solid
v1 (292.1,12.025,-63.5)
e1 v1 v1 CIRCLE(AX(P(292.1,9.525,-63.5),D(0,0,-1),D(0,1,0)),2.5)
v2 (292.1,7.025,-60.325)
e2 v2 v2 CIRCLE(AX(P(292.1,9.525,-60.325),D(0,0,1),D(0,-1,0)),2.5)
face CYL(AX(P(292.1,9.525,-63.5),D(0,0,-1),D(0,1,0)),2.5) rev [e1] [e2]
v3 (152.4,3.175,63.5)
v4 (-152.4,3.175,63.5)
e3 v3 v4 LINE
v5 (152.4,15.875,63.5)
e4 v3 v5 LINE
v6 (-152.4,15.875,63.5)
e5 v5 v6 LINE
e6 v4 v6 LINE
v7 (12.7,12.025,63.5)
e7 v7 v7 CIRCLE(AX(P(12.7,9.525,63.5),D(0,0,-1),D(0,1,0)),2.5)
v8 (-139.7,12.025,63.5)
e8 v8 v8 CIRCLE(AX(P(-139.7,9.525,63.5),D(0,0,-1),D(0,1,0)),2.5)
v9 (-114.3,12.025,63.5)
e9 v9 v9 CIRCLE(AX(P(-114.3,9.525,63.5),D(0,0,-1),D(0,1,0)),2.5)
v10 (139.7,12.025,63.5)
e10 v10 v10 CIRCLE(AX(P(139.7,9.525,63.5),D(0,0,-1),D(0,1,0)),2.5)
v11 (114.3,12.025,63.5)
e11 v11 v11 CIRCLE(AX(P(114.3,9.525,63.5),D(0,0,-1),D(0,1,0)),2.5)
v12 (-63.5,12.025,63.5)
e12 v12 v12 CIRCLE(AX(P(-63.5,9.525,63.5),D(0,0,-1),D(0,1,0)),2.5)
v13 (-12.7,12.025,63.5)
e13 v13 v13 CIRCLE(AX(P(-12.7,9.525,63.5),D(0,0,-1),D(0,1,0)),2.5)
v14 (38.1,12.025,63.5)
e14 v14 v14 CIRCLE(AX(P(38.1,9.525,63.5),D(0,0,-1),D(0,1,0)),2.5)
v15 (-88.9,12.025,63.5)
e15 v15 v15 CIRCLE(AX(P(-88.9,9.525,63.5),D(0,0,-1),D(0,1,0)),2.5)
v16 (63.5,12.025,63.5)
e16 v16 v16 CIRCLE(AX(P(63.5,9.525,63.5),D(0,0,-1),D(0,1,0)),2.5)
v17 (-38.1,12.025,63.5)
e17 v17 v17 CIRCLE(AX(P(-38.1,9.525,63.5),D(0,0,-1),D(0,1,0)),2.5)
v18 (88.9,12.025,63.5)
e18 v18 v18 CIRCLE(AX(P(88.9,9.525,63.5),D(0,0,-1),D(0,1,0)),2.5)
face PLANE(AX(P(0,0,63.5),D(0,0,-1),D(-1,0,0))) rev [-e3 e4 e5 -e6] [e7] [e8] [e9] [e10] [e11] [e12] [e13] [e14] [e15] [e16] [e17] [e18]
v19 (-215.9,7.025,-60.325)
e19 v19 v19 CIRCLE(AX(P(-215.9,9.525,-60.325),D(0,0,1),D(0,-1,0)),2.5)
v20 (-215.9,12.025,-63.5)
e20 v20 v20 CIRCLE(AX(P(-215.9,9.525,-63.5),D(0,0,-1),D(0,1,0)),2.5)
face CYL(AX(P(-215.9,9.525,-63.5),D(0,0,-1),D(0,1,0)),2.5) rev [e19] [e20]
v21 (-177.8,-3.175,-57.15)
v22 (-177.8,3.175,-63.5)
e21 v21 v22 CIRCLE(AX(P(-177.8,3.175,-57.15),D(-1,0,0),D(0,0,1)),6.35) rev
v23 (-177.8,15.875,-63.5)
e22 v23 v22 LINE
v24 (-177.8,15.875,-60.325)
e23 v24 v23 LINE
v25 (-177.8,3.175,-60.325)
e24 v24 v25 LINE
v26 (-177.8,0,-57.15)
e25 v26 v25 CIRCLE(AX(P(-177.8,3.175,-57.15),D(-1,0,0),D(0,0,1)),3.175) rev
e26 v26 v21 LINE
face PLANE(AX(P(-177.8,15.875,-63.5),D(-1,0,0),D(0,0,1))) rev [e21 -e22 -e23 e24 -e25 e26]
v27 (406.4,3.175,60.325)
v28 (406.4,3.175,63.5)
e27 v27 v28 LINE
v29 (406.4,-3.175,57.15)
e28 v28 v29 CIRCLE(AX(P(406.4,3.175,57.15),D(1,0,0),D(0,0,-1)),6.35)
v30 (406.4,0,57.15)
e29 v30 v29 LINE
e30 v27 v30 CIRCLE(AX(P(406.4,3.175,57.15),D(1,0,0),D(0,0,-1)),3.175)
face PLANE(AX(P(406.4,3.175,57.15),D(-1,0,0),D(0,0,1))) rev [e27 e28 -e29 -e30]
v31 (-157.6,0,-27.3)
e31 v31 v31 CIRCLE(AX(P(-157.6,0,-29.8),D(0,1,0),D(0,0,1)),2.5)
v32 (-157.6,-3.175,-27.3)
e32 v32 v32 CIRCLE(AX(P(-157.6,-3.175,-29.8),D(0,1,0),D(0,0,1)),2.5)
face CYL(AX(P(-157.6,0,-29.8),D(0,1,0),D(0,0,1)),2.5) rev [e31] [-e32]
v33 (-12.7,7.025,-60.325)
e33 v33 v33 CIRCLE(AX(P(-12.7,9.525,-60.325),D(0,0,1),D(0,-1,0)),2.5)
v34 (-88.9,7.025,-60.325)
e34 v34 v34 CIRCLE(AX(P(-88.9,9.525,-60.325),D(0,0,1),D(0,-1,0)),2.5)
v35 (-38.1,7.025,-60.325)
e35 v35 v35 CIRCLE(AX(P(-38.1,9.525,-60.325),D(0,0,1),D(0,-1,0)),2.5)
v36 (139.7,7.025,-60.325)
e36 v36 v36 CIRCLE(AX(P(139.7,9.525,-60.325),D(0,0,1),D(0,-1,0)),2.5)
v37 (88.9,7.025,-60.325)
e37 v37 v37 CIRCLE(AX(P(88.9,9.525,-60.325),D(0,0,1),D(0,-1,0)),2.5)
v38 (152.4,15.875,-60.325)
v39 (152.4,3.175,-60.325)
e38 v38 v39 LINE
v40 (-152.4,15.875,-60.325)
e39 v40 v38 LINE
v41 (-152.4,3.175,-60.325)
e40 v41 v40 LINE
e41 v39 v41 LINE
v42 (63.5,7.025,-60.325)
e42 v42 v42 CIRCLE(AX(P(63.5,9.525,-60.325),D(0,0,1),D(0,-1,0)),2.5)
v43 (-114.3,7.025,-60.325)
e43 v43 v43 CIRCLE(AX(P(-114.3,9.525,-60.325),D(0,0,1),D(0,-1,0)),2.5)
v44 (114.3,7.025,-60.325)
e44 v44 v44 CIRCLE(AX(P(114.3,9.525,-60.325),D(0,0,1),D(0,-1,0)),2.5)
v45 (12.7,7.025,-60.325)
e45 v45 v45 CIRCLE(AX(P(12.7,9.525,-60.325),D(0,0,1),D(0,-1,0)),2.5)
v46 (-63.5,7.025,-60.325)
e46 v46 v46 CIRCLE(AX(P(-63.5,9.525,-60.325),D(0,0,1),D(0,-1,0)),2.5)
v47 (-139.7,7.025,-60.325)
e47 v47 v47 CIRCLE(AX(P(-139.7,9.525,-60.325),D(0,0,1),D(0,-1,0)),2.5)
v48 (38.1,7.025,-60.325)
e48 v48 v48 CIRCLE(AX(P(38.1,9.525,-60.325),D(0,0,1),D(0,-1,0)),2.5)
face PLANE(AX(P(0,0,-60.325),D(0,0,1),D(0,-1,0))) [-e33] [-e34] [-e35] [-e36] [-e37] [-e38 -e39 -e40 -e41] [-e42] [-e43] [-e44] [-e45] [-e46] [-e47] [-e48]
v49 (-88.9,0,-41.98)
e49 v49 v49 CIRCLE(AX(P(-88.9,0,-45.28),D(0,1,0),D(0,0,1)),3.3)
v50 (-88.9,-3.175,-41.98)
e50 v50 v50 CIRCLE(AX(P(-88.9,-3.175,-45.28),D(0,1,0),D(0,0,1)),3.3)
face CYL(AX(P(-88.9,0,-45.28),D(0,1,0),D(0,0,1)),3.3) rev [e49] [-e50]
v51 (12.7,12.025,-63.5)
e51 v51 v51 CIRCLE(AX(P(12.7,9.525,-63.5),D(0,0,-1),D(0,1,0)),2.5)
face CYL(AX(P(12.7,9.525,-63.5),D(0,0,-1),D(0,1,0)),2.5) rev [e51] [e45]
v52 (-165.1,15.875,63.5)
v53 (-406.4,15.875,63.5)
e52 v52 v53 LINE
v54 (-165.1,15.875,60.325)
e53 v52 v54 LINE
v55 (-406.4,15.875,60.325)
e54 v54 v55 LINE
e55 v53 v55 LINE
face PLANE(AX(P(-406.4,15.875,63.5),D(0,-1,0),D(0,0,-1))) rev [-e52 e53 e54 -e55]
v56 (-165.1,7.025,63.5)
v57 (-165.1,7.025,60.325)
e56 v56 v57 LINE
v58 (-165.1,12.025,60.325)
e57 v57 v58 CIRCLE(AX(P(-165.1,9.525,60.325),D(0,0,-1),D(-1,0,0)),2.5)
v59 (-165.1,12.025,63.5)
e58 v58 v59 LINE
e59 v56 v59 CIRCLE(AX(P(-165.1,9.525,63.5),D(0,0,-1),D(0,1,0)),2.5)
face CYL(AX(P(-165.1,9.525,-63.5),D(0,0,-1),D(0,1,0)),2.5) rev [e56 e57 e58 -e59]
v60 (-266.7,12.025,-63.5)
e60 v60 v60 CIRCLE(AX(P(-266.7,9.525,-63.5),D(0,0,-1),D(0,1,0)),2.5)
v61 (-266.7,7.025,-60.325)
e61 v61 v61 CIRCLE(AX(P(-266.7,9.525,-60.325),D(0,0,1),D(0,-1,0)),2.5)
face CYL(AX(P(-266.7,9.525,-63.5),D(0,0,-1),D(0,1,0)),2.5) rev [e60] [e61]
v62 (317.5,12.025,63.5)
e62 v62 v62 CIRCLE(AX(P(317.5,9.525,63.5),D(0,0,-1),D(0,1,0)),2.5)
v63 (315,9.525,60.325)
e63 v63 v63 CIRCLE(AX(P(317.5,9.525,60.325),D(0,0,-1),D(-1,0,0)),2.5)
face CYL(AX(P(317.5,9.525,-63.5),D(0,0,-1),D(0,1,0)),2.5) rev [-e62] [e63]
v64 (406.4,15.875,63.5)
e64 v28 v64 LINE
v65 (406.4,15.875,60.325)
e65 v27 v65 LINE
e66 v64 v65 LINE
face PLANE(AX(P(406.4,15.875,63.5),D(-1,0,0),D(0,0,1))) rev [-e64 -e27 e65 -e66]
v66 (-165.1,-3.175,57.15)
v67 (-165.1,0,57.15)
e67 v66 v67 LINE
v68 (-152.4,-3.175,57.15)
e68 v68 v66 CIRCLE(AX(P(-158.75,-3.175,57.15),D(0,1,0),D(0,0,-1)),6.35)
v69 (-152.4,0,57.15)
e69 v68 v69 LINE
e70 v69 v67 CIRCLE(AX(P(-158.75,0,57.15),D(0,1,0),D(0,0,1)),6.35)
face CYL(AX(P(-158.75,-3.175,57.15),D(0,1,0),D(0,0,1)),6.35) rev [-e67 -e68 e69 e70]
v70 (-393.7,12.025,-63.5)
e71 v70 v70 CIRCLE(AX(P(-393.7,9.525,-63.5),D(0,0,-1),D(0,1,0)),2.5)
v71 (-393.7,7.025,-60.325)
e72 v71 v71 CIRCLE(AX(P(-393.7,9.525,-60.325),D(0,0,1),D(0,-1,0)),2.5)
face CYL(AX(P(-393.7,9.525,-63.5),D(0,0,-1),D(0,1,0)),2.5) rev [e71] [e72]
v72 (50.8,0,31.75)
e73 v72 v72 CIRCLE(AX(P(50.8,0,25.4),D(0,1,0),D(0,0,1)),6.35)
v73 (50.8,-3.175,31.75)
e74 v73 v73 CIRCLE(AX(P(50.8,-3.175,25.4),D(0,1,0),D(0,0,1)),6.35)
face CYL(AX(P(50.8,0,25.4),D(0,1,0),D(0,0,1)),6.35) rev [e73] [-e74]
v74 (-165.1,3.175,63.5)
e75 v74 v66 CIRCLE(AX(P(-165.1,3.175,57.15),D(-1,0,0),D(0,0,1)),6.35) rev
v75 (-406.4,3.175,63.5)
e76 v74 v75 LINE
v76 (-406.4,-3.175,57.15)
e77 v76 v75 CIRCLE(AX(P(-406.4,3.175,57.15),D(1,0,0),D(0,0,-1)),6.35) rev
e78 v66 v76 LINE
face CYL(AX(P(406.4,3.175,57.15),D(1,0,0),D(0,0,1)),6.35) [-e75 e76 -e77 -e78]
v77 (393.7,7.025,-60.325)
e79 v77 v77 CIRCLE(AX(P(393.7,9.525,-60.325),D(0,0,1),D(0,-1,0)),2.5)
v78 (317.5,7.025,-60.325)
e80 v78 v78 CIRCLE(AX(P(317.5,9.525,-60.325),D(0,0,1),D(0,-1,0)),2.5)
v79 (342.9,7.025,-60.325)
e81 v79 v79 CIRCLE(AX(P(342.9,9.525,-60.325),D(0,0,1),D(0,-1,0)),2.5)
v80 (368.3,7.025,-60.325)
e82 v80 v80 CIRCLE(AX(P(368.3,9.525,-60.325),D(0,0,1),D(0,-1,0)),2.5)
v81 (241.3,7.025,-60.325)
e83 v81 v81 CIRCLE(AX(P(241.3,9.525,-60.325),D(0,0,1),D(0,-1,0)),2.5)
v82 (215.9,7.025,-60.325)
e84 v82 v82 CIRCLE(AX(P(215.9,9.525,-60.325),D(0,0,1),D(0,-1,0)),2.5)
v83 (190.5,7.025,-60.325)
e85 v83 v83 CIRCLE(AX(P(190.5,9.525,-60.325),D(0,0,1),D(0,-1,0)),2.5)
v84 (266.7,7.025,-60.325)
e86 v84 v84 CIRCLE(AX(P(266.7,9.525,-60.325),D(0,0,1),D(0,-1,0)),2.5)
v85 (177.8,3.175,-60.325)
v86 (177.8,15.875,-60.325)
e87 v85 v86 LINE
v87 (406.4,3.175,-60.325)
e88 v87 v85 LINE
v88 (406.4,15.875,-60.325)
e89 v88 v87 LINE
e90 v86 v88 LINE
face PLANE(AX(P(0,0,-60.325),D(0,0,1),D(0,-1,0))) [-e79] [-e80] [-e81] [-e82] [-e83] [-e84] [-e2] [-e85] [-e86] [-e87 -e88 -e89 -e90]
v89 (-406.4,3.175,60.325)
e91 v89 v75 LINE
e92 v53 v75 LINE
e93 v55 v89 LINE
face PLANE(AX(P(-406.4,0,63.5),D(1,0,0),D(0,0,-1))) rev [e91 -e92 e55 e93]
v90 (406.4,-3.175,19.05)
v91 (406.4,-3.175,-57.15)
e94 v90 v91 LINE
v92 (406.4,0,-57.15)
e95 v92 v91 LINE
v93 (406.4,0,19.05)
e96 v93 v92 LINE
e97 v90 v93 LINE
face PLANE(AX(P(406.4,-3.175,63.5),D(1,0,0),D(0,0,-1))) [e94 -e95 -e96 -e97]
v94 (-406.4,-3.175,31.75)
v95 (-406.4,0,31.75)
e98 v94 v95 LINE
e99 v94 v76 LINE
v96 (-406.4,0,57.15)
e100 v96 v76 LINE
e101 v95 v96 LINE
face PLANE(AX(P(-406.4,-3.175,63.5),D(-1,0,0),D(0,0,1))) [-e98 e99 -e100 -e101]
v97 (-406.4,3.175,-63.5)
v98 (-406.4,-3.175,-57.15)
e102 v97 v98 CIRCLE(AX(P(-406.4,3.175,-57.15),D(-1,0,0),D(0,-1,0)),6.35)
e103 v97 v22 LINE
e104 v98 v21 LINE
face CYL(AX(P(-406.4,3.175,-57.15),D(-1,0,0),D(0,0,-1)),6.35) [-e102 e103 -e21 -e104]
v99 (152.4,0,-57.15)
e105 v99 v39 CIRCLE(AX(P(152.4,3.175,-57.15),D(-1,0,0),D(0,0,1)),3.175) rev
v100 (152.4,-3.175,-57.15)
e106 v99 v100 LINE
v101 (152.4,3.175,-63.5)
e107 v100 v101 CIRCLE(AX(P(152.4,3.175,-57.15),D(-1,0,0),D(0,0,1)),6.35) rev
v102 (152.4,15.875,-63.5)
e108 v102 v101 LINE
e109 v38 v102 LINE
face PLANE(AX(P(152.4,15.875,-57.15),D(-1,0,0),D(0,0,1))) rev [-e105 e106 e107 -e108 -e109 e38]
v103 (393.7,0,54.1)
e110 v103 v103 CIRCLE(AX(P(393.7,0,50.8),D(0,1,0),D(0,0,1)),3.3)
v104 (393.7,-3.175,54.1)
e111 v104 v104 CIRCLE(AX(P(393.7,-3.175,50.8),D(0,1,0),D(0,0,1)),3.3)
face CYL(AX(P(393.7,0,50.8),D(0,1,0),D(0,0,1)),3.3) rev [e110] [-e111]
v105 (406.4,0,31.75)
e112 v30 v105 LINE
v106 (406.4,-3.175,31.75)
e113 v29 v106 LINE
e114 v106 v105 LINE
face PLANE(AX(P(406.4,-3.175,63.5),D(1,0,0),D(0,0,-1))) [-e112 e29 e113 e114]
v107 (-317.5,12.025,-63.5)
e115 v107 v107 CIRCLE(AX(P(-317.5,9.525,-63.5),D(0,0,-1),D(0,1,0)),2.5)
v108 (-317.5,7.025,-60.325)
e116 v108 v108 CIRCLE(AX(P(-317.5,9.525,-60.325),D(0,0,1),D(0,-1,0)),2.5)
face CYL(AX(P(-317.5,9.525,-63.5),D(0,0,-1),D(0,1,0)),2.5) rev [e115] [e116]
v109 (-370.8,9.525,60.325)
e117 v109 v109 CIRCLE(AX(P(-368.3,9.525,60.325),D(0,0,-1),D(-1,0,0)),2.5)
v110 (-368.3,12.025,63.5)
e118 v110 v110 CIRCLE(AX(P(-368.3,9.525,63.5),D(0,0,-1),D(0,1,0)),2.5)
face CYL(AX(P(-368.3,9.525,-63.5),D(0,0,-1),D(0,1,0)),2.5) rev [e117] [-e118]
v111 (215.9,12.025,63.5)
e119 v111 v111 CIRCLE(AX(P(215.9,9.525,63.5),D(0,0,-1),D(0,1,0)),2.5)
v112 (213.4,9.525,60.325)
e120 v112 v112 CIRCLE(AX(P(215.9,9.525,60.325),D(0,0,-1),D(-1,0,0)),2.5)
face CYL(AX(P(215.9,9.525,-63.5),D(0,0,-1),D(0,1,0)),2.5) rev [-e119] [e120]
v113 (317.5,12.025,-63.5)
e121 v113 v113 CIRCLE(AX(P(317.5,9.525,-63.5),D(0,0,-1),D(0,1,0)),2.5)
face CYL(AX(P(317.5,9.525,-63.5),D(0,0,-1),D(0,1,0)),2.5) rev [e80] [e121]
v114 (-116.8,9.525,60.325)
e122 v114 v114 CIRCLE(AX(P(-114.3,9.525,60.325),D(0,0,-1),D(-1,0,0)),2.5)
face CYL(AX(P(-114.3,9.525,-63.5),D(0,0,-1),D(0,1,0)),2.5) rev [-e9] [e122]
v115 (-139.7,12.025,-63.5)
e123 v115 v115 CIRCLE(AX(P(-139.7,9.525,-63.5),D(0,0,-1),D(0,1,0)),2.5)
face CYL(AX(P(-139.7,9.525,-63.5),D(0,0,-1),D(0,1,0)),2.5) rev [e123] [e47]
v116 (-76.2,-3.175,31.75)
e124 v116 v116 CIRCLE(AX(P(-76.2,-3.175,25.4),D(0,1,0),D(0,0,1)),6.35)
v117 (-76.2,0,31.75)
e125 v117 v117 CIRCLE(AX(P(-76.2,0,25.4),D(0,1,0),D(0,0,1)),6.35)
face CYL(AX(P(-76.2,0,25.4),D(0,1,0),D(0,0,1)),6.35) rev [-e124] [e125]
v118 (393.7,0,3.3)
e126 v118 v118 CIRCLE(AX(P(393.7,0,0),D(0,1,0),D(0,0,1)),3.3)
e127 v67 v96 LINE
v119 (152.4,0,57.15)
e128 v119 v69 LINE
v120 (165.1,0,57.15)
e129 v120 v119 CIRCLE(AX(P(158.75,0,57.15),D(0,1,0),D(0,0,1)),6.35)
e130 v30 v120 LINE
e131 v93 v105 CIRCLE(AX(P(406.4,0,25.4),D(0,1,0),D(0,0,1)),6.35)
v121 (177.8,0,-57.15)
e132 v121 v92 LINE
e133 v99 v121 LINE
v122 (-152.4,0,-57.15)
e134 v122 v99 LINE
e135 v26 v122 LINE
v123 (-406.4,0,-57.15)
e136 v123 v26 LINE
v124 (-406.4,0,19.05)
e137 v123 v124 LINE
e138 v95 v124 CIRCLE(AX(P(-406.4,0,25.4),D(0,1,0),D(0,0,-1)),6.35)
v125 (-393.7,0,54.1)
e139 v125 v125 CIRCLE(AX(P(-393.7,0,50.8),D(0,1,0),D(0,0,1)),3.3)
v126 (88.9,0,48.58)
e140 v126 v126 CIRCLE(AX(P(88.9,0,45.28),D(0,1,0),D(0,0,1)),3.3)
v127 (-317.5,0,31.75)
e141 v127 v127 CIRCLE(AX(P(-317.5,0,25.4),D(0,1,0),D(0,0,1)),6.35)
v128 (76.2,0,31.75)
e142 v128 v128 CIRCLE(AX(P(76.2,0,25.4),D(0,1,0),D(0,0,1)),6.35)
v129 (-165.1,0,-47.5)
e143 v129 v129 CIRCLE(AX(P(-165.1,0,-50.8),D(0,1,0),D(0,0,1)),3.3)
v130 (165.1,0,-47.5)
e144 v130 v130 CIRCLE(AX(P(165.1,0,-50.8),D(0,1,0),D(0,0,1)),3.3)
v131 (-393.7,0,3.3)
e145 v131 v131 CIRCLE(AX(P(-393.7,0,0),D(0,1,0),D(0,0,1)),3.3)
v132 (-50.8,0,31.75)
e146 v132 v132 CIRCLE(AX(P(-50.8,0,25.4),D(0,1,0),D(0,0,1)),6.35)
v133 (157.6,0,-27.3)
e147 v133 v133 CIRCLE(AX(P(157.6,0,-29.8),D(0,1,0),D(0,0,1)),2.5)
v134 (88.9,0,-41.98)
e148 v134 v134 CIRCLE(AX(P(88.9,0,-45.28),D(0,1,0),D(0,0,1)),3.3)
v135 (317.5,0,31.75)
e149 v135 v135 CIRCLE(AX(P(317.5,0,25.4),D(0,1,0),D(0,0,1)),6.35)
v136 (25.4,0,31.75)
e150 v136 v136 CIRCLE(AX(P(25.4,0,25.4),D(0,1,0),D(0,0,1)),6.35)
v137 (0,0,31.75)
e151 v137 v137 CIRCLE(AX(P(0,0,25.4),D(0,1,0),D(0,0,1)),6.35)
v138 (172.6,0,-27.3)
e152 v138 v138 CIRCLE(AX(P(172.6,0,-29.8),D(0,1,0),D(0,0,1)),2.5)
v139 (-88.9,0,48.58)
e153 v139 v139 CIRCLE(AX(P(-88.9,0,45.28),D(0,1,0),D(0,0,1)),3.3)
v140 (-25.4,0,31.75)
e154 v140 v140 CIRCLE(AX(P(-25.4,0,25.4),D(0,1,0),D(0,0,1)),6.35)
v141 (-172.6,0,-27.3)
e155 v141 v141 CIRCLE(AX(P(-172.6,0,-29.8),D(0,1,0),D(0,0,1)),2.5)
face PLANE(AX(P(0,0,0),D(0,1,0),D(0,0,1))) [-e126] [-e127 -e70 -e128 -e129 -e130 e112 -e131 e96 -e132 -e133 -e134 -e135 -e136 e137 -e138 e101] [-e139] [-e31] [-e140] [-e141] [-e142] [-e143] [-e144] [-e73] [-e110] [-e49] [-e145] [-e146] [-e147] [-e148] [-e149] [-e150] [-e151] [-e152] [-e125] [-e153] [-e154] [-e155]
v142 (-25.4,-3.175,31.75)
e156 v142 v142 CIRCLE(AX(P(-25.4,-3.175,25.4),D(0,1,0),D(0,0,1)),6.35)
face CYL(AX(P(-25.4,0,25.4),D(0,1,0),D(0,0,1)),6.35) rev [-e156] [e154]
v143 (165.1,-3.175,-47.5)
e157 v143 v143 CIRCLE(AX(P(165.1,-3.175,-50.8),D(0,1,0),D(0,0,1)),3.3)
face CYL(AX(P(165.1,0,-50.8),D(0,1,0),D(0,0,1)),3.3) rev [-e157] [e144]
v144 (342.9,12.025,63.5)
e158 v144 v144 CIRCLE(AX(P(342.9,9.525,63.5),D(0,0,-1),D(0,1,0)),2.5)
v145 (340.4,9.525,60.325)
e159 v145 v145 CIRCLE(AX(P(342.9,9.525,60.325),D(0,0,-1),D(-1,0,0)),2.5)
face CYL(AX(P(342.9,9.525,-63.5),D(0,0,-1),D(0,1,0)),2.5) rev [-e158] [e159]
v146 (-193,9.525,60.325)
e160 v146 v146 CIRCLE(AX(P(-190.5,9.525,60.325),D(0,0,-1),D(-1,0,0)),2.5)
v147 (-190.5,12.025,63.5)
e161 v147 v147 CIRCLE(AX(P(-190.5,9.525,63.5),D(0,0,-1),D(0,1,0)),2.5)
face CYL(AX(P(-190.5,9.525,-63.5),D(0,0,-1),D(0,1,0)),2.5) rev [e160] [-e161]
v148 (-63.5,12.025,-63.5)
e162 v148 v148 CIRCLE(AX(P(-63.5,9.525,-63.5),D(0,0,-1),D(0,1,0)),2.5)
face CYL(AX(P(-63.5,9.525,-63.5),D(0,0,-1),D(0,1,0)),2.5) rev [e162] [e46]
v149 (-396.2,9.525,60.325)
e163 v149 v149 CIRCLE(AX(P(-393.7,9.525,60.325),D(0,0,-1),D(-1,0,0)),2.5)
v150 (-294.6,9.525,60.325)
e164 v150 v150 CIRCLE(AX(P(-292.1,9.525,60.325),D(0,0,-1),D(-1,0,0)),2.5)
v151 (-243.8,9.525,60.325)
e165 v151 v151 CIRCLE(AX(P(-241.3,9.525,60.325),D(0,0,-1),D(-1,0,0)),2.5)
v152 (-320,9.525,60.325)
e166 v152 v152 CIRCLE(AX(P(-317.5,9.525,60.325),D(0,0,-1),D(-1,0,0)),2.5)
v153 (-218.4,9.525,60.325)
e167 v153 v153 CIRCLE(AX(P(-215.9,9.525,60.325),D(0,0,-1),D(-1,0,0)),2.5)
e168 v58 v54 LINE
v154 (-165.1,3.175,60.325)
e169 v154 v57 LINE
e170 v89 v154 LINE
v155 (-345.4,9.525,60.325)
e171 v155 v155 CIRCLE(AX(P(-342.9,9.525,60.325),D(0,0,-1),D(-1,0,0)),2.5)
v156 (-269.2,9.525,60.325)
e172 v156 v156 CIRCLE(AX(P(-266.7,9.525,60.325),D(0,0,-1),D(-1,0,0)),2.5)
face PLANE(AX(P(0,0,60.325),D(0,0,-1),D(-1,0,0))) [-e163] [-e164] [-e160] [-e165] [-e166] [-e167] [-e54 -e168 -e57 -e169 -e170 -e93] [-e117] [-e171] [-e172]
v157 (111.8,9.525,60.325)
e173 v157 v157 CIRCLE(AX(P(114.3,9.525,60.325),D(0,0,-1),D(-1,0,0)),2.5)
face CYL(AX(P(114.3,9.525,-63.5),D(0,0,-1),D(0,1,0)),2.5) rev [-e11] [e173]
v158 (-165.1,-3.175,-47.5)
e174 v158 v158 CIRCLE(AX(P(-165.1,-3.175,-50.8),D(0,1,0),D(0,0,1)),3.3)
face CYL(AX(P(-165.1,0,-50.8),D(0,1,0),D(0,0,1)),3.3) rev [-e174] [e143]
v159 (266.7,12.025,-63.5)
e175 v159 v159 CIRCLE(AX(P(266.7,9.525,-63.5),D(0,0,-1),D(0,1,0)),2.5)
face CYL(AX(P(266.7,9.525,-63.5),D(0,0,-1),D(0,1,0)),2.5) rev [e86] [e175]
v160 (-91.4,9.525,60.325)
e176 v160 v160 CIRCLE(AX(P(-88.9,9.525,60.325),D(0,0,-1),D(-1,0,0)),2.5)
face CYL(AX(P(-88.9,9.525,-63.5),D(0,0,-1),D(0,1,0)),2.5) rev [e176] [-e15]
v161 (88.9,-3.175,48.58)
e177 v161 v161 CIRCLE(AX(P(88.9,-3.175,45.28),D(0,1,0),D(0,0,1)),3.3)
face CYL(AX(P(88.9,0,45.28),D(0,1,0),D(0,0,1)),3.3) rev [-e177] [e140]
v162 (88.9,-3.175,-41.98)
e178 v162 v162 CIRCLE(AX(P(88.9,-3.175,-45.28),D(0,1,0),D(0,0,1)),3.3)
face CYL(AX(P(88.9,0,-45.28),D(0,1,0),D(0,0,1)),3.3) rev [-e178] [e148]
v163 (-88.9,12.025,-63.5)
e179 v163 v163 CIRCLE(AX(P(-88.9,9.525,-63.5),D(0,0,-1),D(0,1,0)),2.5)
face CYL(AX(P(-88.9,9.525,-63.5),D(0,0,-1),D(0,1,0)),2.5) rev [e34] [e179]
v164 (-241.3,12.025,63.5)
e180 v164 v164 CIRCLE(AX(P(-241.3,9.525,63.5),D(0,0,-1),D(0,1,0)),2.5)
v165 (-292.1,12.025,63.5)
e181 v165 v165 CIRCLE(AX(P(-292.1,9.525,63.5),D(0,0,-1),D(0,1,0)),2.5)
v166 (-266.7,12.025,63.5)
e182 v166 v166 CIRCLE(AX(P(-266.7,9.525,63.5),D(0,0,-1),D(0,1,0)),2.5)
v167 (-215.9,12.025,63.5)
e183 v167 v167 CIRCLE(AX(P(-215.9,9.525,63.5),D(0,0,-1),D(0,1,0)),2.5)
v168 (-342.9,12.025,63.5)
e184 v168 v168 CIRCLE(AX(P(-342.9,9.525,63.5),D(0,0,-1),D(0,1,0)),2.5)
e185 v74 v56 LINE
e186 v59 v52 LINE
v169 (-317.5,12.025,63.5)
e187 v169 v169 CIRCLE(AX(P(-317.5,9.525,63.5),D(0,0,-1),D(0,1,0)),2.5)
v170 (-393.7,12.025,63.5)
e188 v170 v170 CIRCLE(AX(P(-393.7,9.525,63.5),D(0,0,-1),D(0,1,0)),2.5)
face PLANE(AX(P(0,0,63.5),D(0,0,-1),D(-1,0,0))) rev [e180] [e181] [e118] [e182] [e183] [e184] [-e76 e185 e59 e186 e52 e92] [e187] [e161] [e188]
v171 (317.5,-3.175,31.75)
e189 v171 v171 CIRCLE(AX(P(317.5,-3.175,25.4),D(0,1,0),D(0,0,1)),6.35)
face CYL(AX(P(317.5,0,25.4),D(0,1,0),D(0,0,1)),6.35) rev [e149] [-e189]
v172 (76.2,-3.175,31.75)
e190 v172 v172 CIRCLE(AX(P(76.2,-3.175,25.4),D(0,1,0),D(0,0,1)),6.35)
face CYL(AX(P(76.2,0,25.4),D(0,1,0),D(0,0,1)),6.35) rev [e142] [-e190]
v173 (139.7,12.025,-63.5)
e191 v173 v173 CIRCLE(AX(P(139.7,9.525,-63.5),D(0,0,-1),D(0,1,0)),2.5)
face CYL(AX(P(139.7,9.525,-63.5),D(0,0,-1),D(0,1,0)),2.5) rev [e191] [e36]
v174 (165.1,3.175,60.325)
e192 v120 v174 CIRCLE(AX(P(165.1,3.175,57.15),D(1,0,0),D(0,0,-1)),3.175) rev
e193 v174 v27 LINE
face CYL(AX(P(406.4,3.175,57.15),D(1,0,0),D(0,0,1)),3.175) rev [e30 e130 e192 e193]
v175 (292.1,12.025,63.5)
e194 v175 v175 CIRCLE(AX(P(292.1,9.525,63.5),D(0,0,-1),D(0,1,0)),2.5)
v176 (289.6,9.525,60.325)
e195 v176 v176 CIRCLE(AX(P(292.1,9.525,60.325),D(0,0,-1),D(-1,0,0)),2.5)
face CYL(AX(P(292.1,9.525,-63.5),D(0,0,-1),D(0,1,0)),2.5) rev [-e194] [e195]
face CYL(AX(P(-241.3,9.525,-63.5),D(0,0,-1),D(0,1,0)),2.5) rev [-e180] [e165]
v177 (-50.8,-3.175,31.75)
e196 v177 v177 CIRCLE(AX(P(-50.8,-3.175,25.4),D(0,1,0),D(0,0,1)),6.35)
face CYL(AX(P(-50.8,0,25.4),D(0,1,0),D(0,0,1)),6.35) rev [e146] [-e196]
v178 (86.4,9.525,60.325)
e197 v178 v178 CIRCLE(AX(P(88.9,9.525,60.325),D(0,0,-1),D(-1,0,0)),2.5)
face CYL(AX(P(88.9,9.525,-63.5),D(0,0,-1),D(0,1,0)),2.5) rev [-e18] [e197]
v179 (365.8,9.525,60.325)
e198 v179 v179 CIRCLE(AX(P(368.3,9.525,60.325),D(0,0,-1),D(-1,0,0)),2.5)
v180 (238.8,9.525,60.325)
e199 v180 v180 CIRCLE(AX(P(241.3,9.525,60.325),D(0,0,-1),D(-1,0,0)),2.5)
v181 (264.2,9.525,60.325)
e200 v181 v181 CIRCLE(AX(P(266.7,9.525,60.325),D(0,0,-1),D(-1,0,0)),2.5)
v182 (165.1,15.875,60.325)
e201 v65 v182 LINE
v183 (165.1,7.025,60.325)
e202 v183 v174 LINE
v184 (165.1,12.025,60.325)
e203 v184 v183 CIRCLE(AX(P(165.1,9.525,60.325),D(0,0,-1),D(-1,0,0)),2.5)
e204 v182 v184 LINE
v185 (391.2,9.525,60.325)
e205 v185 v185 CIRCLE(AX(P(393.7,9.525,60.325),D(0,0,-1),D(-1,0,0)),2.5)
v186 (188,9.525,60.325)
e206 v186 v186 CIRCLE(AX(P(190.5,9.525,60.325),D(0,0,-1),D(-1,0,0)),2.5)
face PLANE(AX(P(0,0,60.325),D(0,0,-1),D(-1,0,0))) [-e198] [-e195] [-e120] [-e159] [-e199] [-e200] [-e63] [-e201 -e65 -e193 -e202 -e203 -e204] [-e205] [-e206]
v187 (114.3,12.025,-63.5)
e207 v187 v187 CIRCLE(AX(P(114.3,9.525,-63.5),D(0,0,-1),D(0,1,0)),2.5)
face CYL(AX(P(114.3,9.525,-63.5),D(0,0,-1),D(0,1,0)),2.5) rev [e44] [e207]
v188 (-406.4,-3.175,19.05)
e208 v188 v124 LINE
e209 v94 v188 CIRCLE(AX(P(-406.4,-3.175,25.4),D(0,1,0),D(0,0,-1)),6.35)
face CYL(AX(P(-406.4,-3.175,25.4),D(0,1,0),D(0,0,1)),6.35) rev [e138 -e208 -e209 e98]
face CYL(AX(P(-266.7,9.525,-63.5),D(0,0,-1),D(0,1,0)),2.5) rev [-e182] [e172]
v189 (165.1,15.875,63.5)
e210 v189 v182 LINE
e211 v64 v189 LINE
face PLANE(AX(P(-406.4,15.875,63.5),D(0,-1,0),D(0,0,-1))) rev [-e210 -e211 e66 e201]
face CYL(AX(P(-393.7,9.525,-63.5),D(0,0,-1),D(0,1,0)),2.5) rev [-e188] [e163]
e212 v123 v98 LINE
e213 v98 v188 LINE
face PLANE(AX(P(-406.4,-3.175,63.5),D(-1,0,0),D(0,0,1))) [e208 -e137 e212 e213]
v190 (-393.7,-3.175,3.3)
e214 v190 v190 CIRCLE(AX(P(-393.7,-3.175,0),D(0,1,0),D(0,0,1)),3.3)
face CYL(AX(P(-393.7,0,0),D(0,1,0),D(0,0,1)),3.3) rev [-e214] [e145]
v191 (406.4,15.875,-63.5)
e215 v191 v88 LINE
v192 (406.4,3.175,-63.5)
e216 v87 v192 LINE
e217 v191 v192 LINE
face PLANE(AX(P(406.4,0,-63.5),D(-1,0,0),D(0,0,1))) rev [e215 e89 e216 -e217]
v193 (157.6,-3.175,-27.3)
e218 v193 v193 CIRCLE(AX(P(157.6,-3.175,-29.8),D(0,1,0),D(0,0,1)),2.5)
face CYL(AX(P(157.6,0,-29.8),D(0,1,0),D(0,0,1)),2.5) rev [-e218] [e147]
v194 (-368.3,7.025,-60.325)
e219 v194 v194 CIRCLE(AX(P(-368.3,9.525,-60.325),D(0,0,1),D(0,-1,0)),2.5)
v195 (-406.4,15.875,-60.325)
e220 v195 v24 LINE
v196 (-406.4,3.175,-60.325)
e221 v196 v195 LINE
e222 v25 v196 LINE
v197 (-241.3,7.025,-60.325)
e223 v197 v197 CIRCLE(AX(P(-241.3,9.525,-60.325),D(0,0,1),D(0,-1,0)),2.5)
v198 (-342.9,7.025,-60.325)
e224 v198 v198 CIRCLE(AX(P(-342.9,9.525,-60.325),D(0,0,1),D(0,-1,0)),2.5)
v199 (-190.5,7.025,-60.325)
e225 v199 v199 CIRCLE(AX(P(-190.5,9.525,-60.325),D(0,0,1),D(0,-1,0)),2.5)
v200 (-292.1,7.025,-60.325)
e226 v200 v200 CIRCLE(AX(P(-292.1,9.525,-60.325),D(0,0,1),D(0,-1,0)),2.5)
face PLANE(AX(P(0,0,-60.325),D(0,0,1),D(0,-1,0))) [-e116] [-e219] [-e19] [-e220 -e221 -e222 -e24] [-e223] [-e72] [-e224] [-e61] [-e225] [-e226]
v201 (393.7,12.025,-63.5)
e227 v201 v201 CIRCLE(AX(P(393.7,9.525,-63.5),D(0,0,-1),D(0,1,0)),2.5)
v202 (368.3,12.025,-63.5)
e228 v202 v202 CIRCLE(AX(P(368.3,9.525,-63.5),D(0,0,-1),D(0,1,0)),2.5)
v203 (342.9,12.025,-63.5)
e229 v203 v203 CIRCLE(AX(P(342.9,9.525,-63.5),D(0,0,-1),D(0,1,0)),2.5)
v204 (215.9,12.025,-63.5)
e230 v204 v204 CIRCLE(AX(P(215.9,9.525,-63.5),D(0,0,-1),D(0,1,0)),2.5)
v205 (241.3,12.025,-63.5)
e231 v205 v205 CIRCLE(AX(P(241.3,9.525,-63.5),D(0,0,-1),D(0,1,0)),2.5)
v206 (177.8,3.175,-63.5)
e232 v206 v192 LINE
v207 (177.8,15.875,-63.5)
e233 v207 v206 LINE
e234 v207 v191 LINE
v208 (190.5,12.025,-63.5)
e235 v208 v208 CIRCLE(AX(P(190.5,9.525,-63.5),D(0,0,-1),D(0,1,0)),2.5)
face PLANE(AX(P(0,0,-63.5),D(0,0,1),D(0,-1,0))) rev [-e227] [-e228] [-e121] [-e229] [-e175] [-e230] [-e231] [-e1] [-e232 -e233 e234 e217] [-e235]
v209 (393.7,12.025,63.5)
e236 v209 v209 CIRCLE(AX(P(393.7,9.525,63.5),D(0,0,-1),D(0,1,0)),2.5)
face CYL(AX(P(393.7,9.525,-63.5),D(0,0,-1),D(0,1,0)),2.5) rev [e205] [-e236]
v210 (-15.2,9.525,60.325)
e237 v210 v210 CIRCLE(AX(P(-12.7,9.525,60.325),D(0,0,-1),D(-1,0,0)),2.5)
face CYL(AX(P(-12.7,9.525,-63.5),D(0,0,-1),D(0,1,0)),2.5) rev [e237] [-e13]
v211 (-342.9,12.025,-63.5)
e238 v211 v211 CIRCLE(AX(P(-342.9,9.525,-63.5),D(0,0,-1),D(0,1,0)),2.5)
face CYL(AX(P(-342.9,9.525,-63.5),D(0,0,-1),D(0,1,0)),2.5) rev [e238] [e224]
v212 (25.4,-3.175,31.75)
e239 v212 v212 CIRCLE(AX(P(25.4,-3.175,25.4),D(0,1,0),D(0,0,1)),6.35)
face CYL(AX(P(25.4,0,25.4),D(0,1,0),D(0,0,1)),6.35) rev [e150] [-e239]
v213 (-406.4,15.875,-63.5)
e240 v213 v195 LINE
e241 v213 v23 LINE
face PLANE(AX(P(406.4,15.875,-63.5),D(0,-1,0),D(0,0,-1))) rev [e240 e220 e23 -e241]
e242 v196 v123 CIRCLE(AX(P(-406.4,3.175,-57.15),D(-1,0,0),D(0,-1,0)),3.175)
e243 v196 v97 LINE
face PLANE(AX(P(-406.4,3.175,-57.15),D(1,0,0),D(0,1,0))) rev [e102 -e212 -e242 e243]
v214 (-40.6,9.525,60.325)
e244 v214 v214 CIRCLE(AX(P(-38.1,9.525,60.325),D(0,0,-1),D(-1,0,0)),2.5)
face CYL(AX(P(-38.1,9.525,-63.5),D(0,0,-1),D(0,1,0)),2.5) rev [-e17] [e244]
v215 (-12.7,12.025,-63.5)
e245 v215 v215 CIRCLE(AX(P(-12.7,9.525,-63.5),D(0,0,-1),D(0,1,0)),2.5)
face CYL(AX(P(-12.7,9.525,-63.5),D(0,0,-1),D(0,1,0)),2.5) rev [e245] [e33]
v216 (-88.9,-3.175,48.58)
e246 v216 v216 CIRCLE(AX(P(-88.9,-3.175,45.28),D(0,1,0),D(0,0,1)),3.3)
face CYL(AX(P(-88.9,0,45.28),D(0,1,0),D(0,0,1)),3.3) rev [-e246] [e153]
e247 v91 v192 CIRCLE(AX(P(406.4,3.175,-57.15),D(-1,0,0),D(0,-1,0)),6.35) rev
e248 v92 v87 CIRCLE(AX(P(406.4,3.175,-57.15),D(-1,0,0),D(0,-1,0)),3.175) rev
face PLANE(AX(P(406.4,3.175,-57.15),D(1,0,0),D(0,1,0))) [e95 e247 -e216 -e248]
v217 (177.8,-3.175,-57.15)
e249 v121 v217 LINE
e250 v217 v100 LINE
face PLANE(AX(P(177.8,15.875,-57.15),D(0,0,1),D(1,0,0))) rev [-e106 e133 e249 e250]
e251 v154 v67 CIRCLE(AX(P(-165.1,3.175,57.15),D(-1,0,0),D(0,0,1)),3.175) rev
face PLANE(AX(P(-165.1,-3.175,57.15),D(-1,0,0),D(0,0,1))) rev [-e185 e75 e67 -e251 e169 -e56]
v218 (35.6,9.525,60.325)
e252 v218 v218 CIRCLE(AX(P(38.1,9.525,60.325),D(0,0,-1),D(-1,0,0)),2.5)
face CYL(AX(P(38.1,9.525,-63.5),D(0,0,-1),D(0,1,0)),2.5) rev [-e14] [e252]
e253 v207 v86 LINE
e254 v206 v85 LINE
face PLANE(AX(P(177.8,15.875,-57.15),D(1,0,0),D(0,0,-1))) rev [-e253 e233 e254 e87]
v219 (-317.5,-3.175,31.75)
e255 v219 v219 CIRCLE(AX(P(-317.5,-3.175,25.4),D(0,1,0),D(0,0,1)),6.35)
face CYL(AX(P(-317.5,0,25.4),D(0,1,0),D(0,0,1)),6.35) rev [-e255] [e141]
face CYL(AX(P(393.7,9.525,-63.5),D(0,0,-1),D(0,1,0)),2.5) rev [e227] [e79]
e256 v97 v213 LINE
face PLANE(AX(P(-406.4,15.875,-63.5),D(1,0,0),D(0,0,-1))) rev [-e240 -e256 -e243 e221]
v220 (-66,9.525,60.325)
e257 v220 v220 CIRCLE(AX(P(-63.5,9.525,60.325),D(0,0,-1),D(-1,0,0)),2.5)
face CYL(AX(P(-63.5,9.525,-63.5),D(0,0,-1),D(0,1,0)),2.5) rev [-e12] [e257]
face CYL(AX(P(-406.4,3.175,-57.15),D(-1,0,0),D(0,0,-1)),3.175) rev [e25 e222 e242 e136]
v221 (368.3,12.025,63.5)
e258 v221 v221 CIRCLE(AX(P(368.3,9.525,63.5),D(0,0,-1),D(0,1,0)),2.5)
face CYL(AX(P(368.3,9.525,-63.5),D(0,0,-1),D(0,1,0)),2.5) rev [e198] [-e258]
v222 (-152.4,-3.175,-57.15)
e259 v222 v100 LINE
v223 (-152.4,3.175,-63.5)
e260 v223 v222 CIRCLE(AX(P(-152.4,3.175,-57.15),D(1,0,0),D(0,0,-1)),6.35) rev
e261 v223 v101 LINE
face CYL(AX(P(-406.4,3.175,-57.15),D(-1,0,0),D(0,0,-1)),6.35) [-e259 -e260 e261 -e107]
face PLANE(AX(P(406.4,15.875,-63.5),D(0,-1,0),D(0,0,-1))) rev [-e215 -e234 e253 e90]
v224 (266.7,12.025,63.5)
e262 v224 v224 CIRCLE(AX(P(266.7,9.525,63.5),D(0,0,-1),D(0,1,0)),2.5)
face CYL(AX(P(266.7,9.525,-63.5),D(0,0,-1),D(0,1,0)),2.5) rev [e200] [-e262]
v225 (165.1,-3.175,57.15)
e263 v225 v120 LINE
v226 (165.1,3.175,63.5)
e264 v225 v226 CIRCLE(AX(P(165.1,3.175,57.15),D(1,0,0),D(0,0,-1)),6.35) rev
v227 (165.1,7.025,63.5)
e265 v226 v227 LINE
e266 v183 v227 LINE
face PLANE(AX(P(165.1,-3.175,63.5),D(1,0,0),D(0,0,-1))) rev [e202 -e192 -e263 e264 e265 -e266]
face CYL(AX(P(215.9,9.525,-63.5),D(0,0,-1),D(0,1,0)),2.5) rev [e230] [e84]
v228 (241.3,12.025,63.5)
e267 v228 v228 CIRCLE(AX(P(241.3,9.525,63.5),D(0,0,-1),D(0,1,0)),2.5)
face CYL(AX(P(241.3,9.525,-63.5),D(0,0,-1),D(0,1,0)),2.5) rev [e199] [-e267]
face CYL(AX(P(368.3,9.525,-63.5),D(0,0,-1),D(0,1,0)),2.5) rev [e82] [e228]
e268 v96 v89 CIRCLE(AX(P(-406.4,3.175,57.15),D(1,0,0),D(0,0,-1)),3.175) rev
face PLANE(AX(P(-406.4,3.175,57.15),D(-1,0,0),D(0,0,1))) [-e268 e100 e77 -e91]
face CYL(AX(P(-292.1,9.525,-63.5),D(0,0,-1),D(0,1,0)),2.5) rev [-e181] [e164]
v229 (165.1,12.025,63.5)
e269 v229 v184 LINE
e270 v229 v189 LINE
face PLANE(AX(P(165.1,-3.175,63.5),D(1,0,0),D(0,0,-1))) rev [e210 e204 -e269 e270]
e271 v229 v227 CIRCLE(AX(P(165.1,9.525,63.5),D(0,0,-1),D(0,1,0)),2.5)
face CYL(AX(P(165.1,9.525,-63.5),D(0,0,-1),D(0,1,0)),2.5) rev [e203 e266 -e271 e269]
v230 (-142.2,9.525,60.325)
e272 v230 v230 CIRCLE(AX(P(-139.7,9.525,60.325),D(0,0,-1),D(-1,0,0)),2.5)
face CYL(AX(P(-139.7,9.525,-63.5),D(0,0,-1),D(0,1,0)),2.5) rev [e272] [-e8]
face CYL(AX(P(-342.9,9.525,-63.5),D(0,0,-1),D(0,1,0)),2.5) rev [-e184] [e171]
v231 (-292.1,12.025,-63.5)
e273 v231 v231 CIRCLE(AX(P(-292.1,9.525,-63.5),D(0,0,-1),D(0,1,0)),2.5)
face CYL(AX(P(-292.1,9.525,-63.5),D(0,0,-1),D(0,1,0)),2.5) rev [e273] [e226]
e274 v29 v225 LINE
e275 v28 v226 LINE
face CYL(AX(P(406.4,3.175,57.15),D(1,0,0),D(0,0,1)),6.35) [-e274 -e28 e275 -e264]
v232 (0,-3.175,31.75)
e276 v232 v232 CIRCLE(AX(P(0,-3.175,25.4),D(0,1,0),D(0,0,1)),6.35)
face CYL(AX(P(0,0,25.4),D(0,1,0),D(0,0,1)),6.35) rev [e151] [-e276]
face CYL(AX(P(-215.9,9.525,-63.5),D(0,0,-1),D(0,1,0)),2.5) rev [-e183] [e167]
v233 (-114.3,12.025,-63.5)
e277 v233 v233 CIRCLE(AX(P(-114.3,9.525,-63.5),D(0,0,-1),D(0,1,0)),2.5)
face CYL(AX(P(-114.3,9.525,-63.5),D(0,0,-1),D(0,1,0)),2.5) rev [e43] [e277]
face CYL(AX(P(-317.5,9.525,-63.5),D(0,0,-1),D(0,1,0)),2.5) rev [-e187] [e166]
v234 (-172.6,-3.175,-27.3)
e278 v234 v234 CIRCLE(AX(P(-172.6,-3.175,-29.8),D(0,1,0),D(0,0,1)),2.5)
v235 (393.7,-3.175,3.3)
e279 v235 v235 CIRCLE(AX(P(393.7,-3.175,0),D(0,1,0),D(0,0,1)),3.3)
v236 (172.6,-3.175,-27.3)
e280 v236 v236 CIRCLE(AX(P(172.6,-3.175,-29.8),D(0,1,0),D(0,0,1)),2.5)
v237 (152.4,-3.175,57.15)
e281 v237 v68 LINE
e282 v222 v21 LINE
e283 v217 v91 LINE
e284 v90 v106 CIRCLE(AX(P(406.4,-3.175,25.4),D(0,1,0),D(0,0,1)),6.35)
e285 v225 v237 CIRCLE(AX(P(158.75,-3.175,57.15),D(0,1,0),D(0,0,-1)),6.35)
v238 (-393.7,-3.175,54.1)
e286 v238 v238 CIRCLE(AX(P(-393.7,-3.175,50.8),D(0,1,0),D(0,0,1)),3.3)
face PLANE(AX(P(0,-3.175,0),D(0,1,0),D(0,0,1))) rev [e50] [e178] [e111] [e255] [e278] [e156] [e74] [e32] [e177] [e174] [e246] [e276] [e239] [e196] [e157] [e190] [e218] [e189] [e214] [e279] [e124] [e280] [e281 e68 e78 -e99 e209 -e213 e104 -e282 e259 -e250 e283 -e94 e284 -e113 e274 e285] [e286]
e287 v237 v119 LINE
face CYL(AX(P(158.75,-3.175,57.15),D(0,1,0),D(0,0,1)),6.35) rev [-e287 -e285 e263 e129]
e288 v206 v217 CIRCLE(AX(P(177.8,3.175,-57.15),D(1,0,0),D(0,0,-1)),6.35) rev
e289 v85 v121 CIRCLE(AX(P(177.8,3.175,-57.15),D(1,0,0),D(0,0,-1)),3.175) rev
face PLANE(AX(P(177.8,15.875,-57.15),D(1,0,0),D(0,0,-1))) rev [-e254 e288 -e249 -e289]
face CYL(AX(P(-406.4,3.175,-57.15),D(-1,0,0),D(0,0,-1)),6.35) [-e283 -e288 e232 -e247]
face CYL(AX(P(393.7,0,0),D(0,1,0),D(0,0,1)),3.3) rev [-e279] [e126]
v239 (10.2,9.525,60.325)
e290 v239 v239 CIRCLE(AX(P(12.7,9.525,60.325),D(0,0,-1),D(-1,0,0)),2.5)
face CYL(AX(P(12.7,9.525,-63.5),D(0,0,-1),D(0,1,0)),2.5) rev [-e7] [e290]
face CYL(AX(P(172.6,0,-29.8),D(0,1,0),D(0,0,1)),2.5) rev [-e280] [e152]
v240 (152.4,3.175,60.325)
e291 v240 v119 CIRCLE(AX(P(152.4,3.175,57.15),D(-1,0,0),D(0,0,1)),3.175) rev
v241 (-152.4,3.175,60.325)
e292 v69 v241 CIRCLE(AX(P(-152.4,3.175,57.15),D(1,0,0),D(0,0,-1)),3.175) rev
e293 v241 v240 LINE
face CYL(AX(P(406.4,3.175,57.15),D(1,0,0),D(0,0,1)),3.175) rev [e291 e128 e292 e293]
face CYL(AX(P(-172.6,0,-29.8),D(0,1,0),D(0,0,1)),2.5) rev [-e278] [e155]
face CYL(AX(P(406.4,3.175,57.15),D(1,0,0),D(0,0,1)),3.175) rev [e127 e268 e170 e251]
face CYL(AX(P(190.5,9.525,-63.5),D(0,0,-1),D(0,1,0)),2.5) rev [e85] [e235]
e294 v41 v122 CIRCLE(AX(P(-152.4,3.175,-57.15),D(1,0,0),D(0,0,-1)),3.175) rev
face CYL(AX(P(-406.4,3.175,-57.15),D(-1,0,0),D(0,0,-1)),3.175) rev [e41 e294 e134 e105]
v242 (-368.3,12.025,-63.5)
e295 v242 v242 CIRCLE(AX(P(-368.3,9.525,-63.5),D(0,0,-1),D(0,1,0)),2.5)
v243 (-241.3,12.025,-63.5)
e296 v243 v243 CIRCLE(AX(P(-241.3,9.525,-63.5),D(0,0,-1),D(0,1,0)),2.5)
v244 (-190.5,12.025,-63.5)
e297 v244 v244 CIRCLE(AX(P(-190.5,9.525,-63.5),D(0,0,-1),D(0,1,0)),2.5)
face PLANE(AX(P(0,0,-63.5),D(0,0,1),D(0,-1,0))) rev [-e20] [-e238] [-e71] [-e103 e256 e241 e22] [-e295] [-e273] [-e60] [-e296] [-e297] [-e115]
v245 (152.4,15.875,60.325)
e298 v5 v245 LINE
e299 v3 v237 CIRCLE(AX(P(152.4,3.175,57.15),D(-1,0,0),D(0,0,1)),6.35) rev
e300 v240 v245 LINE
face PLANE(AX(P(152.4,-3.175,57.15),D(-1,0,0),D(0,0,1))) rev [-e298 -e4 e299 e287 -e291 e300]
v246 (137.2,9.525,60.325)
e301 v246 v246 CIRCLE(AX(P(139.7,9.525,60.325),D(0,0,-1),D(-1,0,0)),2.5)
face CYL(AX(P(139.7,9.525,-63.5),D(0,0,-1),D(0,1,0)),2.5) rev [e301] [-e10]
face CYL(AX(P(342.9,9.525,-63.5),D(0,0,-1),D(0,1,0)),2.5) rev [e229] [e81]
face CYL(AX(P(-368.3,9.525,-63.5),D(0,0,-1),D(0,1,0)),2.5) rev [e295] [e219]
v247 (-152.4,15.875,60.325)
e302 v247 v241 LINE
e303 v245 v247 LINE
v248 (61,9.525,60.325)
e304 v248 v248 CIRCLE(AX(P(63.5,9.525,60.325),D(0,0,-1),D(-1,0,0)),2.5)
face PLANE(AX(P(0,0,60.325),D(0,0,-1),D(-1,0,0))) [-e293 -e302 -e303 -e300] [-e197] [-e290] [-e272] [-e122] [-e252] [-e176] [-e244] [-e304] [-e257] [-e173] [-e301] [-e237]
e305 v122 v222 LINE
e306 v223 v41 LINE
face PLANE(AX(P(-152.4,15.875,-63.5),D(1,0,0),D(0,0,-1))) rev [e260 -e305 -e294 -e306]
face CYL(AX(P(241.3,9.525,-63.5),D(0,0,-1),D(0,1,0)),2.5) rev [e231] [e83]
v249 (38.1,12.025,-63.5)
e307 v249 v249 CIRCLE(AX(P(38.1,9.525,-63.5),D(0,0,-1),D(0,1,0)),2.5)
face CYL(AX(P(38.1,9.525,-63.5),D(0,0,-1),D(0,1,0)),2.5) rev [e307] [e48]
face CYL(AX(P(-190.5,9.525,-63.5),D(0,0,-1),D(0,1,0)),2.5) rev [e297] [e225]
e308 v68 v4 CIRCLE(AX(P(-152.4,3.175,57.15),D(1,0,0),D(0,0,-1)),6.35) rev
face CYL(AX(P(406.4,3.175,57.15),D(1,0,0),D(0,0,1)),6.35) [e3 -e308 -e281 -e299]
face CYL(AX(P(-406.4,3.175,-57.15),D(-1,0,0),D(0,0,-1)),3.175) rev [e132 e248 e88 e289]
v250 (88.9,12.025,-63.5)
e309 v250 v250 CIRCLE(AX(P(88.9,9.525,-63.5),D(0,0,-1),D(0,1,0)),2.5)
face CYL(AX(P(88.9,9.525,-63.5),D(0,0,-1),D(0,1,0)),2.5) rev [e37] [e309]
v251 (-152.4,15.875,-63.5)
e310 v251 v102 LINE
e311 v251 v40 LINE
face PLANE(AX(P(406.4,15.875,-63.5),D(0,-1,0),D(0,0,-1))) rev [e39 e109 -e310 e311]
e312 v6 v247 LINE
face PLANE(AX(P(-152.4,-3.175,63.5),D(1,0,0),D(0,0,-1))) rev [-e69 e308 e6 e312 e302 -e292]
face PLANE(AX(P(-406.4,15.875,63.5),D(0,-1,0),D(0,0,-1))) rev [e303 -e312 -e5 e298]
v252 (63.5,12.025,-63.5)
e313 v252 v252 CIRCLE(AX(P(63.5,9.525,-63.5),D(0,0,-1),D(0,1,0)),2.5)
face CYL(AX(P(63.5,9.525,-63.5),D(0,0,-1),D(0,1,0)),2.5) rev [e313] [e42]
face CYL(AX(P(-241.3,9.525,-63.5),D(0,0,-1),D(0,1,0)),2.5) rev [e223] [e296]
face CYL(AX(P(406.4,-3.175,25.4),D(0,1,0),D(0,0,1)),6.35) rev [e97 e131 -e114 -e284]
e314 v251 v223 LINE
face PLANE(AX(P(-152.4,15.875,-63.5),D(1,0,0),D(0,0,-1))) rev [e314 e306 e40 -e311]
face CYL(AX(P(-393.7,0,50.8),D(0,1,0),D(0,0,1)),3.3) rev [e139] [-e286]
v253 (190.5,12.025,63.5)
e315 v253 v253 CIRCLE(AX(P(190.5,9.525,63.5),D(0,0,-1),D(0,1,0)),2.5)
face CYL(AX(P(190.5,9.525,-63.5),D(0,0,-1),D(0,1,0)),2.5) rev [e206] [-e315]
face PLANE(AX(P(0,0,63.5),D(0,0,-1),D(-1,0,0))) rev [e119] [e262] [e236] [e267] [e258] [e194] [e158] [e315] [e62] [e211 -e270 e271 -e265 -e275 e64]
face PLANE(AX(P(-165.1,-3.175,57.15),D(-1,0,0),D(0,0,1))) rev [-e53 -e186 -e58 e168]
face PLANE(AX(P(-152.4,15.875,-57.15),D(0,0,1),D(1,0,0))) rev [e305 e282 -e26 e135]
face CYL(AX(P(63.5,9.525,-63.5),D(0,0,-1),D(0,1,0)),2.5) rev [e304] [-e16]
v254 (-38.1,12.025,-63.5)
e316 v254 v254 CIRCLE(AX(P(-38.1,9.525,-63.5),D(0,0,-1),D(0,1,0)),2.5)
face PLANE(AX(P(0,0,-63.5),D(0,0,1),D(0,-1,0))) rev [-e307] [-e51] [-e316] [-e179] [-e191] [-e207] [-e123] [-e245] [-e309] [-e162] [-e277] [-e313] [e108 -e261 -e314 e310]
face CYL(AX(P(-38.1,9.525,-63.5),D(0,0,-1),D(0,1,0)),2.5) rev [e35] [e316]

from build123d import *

# Parameters (mm, degrees)
SKETCH1_W                      = 812.8
SKETCH1_H                      = 127
BASE_FLANGE1_DEPTH             = 3.175
EDGE_FLANGE1_STRIP_W           = 19.05
EDGE_FLANGE1_STRIP_H           = 3.175
EDGE_FLANGE1_STRIP_CUT_DEPTH   = 812.8
EDGE_FLANGE1_STRIP_2_W         = 19.05
EDGE_FLANGE1_STRIP_2_H         = 3.175
EDGE_FLANGE1_STRIP_CUT_2_DEPTH = 812.8
EDGE_FLANGE1_DEPTH             = 812.8
EDGE_FLANGE1_BEND_DEPTH        = 812.8
MOUNTING_HOLES_D               = 5
LPATTERN3_COUNT                = 32
LPATTERN3_PITCH                = 25.4
SKETCH21_W                     = 25.4
SKETCH21_H                     = 6.35
CUT_EXTRUDE3_DEPTH             = 412.771918057
CUT_EXTRUDE4_DEPTH             = 412.637250045
CUT_EXTRUDE4_DEPTH_BACK        = 412.637250045
F_80_20_CONNECTION_HOLES_D     = 6.6
MOTOR_HOLES_D                  = 12.7
F_1_2_0_5_DIAMETER_HOLE1_D     = 12.7
CUT_EXTRUDE5_DEPTH             = 412.637250045
F_1_0MM_DOWEL_HOLE1_D          = 6.6
F_5_0MM_DOWEL_HOLE1_D          = 5


# Sheet-metal steps are written as plain solids
with BuildPart() as part:
    # Sketch1 → Base-Flange1 (new body)
    with BuildSketch(Plane(origin=(0, 0, 0), x_dir=(1, 0, 0), z_dir=(0, 1, 0))):
        Rectangle(SKETCH1_W, SKETCH1_H)
    extrude(amount=-BASE_FLANGE1_DEPTH)

    # Edge-Flange1 strip (across the edge) → Edge-Flange1 strip cut (cut)
    with BuildSketch(Plane(origin=(406.4, 0, -63.5), x_dir=(0, 0, 1), z_dir=(-1, 0, 0))):
        with Locations((-3.175, -1.5875)):
            Rectangle(EDGE_FLANGE1_STRIP_W, EDGE_FLANGE1_STRIP_H)
    extrude(amount=EDGE_FLANGE1_STRIP_CUT_DEPTH, mode=Mode.SUBTRACT)

    # Edge-Flange1 strip 2 (across the edge) → Edge-Flange1 strip cut 2 (cut)
    with BuildSketch(Plane(origin=(-406.4, 0, 63.5), x_dir=(0, 0, -1), z_dir=(1, 0, 0))):
        with Locations((-3.175, -1.5875)):
            Rectangle(EDGE_FLANGE1_STRIP_2_W, EDGE_FLANGE1_STRIP_2_H)
    extrude(amount=EDGE_FLANGE1_STRIP_CUT_2_DEPTH, mode=Mode.SUBTRACT)

    # Edge-Flange1 section (across the edge) → Edge-Flange1 (add)
    with BuildSketch(Plane(origin=(406.4, 0, -63.5), x_dir=(0, 0, 1), z_dir=(-1, 0, 0))):
        with BuildLine():
            Line((0, 3.175), (0, 15.875))
            Line((0, 15.875), (3.175, 15.875))
            Line((3.175, 15.875), (3.175, 3.175))
            ThreePointArc((3.175, 3.175), (4.10493597, 0.92993597), (6.35, 0))
            Line((6.35, 0), (6.35, -3.175))
            ThreePointArc((6.35, -3.175), (1.859871939, -1.315128061), (0, 3.175))
        make_face()
    extrude(amount=EDGE_FLANGE1_DEPTH)

    # Edge-Flange1 section 2 (across the edge) → Edge-Flange1 bend (add)
    with BuildSketch(Plane(origin=(-406.4, 0, 63.5), x_dir=(0, 0, -1), z_dir=(1, 0, 0))):
        with BuildLine():
            Line((0, 3.175), (0, 15.875))
            Line((0, 15.875), (3.175, 15.875))
            Line((3.175, 15.875), (3.175, 3.175))
            ThreePointArc((3.175, 3.175), (4.10493597, 0.92993597), (6.35, 0))
            Line((6.35, 0), (6.35, -3.175))
            ThreePointArc((6.35, -3.175), (1.859871939, -1.315128061), (0, 3.175))
        make_face()
    extrude(amount=EDGE_FLANGE1_BEND_DEPTH)

    # Mounting Holes (through all)
    with Locations(Plane(origin=(342.9, 0, -63.5), x_dir=(1, 0, 0), z_dir=(0, 0, -1))):
        with Locations((-736.6, -9.525)):
            mounting_holes = Hole(MOUNTING_HOLES_D / 2)

    # LPattern3: Mounting Holes ×32
    with Locations(*[(i * LPATTERN3_PITCH, 0, 0) for i in range(1, LPATTERN3_COUNT)]):
        add(mounting_holes, mode=Mode.SUBTRACT)

    # Sketch21 → Cut-Extrude3 (cut, through all)
    with BuildSketch(Plane.XZ.offset(3.175)):
        with Locations((165.1, -60.325)):
            Rectangle(SKETCH21_W, SKETCH21_H)
        with Locations((-165.1, -60.325)):
            Rectangle(SKETCH21_W, SKETCH21_H)
    extrude(amount=-CUT_EXTRUDE3_DEPTH, mode=Mode.SUBTRACT)

    # Sketch26 → Cut-Extrude4 (cut, two sides: drawn at the far end of the back side and taken through both)
    with BuildSketch(Plane(origin=(0, 0, 0), x_dir=(1, 0, 0), z_dir=(0, 1, 0)).offset(-CUT_EXTRUDE4_DEPTH_BACK)):
        with BuildLine():
            Line((152.4, -57.15), (152.4, -63.5))
            Line((152.4, -63.5), (165.1, -63.5))
            Line((165.1, -63.5), (165.1, -57.15))
            ThreePointArc((165.1, -57.15), (158.75, -50.8), (152.4, -57.15))
        make_face()
        with BuildLine():
            Line((-165.1, -57.15), (-165.1, -63.5))
            Line((-165.1, -63.5), (-152.4, -63.5))
            Line((-152.4, -63.5), (-152.4, -57.15))
            ThreePointArc((-152.4, -57.15), (-158.75, -50.8), (-165.1, -57.15))
        make_face()
    extrude(amount=CUT_EXTRUDE4_DEPTH + CUT_EXTRUDE4_DEPTH_BACK, mode=Mode.SUBTRACT)

    # 80/20 Connection Holes (through all)
    with Locations(Plane(origin=(0, 0, 0), x_dir=(1, 0, 0), z_dir=(0, 1, 0))):
        with Locations((-165.1, 50.8), (165.1, 50.8), (-393.7, 0), (-393.7, -50.8), (393.7, -50.8), (393.7, 0)):
            Hole(F_80_20_CONNECTION_HOLES_D / 2)

    # Motor Holes (through all)
    with Locations(Plane(origin=(0, 0, 0), x_dir=(1, 0, 0), z_dir=(0, 1, 0))):
        with Locations((-317.5, -25.4), (317.5, -25.4)):
            Hole(MOTOR_HOLES_D / 2)

    # 1/2 (0.5) Diameter Hole1 (through all)
    with Locations(Plane(origin=(0, 0, 0), x_dir=(1, 0, 0), z_dir=(0, 1, 0))):
        with Locations((76.2, -25.4), (0, -25.4), (-25.4, -25.4), (-50.8, -25.4), (-76.2, -25.4), (25.4, -25.4), (50.8, -25.4)):
            Hole(F_1_2_0_5_DIAMETER_HOLE1_D / 2)

    # Sketch33 → Cut-Extrude5 (cut, through all)
    with BuildSketch(Plane(origin=(0, 0, 0), x_dir=(1, 0, 0), z_dir=(0, 1, 0))):
        with BuildLine():
            Line((-406.4, -19.05), (-406.4, -31.75))
            ThreePointArc((-406.4, -31.75), (-400.05, -25.4), (-406.4, -19.05))
        make_face()
        with BuildLine():
            Line((406.4, -19.05), (406.4, -31.75))
            ThreePointArc((406.4, -31.75), (400.05, -25.4), (406.4, -19.05))
        make_face()
    extrude(amount=-CUT_EXTRUDE5_DEPTH, mode=Mode.SUBTRACT)

    # Ø1.0mm Dowel Hole1 (through all)
    with Locations(Plane(origin=(0, 0, 0), x_dir=(1, 0, 0), z_dir=(0, 1, 0))):
        with Locations((88.9, -45.28), (-88.9, 45.28), (-88.9, -45.28), (88.9, 45.28)):
            Hole(F_1_0MM_DOWEL_HOLE1_D / 2)

    # Ø5.0mm Dowel Hole1 (through all)
    with Locations(Plane(origin=(0, 0, 0), x_dir=(1, 0, 0), z_dir=(0, 1, 0))):
        with Locations((172.6, 29.8), (-172.6, 29.8), (-157.6, 29.8), (157.6, 29.8)):
            Hole(F_5_0MM_DOWEL_HOLE1_D / 2)


solid = part.part
